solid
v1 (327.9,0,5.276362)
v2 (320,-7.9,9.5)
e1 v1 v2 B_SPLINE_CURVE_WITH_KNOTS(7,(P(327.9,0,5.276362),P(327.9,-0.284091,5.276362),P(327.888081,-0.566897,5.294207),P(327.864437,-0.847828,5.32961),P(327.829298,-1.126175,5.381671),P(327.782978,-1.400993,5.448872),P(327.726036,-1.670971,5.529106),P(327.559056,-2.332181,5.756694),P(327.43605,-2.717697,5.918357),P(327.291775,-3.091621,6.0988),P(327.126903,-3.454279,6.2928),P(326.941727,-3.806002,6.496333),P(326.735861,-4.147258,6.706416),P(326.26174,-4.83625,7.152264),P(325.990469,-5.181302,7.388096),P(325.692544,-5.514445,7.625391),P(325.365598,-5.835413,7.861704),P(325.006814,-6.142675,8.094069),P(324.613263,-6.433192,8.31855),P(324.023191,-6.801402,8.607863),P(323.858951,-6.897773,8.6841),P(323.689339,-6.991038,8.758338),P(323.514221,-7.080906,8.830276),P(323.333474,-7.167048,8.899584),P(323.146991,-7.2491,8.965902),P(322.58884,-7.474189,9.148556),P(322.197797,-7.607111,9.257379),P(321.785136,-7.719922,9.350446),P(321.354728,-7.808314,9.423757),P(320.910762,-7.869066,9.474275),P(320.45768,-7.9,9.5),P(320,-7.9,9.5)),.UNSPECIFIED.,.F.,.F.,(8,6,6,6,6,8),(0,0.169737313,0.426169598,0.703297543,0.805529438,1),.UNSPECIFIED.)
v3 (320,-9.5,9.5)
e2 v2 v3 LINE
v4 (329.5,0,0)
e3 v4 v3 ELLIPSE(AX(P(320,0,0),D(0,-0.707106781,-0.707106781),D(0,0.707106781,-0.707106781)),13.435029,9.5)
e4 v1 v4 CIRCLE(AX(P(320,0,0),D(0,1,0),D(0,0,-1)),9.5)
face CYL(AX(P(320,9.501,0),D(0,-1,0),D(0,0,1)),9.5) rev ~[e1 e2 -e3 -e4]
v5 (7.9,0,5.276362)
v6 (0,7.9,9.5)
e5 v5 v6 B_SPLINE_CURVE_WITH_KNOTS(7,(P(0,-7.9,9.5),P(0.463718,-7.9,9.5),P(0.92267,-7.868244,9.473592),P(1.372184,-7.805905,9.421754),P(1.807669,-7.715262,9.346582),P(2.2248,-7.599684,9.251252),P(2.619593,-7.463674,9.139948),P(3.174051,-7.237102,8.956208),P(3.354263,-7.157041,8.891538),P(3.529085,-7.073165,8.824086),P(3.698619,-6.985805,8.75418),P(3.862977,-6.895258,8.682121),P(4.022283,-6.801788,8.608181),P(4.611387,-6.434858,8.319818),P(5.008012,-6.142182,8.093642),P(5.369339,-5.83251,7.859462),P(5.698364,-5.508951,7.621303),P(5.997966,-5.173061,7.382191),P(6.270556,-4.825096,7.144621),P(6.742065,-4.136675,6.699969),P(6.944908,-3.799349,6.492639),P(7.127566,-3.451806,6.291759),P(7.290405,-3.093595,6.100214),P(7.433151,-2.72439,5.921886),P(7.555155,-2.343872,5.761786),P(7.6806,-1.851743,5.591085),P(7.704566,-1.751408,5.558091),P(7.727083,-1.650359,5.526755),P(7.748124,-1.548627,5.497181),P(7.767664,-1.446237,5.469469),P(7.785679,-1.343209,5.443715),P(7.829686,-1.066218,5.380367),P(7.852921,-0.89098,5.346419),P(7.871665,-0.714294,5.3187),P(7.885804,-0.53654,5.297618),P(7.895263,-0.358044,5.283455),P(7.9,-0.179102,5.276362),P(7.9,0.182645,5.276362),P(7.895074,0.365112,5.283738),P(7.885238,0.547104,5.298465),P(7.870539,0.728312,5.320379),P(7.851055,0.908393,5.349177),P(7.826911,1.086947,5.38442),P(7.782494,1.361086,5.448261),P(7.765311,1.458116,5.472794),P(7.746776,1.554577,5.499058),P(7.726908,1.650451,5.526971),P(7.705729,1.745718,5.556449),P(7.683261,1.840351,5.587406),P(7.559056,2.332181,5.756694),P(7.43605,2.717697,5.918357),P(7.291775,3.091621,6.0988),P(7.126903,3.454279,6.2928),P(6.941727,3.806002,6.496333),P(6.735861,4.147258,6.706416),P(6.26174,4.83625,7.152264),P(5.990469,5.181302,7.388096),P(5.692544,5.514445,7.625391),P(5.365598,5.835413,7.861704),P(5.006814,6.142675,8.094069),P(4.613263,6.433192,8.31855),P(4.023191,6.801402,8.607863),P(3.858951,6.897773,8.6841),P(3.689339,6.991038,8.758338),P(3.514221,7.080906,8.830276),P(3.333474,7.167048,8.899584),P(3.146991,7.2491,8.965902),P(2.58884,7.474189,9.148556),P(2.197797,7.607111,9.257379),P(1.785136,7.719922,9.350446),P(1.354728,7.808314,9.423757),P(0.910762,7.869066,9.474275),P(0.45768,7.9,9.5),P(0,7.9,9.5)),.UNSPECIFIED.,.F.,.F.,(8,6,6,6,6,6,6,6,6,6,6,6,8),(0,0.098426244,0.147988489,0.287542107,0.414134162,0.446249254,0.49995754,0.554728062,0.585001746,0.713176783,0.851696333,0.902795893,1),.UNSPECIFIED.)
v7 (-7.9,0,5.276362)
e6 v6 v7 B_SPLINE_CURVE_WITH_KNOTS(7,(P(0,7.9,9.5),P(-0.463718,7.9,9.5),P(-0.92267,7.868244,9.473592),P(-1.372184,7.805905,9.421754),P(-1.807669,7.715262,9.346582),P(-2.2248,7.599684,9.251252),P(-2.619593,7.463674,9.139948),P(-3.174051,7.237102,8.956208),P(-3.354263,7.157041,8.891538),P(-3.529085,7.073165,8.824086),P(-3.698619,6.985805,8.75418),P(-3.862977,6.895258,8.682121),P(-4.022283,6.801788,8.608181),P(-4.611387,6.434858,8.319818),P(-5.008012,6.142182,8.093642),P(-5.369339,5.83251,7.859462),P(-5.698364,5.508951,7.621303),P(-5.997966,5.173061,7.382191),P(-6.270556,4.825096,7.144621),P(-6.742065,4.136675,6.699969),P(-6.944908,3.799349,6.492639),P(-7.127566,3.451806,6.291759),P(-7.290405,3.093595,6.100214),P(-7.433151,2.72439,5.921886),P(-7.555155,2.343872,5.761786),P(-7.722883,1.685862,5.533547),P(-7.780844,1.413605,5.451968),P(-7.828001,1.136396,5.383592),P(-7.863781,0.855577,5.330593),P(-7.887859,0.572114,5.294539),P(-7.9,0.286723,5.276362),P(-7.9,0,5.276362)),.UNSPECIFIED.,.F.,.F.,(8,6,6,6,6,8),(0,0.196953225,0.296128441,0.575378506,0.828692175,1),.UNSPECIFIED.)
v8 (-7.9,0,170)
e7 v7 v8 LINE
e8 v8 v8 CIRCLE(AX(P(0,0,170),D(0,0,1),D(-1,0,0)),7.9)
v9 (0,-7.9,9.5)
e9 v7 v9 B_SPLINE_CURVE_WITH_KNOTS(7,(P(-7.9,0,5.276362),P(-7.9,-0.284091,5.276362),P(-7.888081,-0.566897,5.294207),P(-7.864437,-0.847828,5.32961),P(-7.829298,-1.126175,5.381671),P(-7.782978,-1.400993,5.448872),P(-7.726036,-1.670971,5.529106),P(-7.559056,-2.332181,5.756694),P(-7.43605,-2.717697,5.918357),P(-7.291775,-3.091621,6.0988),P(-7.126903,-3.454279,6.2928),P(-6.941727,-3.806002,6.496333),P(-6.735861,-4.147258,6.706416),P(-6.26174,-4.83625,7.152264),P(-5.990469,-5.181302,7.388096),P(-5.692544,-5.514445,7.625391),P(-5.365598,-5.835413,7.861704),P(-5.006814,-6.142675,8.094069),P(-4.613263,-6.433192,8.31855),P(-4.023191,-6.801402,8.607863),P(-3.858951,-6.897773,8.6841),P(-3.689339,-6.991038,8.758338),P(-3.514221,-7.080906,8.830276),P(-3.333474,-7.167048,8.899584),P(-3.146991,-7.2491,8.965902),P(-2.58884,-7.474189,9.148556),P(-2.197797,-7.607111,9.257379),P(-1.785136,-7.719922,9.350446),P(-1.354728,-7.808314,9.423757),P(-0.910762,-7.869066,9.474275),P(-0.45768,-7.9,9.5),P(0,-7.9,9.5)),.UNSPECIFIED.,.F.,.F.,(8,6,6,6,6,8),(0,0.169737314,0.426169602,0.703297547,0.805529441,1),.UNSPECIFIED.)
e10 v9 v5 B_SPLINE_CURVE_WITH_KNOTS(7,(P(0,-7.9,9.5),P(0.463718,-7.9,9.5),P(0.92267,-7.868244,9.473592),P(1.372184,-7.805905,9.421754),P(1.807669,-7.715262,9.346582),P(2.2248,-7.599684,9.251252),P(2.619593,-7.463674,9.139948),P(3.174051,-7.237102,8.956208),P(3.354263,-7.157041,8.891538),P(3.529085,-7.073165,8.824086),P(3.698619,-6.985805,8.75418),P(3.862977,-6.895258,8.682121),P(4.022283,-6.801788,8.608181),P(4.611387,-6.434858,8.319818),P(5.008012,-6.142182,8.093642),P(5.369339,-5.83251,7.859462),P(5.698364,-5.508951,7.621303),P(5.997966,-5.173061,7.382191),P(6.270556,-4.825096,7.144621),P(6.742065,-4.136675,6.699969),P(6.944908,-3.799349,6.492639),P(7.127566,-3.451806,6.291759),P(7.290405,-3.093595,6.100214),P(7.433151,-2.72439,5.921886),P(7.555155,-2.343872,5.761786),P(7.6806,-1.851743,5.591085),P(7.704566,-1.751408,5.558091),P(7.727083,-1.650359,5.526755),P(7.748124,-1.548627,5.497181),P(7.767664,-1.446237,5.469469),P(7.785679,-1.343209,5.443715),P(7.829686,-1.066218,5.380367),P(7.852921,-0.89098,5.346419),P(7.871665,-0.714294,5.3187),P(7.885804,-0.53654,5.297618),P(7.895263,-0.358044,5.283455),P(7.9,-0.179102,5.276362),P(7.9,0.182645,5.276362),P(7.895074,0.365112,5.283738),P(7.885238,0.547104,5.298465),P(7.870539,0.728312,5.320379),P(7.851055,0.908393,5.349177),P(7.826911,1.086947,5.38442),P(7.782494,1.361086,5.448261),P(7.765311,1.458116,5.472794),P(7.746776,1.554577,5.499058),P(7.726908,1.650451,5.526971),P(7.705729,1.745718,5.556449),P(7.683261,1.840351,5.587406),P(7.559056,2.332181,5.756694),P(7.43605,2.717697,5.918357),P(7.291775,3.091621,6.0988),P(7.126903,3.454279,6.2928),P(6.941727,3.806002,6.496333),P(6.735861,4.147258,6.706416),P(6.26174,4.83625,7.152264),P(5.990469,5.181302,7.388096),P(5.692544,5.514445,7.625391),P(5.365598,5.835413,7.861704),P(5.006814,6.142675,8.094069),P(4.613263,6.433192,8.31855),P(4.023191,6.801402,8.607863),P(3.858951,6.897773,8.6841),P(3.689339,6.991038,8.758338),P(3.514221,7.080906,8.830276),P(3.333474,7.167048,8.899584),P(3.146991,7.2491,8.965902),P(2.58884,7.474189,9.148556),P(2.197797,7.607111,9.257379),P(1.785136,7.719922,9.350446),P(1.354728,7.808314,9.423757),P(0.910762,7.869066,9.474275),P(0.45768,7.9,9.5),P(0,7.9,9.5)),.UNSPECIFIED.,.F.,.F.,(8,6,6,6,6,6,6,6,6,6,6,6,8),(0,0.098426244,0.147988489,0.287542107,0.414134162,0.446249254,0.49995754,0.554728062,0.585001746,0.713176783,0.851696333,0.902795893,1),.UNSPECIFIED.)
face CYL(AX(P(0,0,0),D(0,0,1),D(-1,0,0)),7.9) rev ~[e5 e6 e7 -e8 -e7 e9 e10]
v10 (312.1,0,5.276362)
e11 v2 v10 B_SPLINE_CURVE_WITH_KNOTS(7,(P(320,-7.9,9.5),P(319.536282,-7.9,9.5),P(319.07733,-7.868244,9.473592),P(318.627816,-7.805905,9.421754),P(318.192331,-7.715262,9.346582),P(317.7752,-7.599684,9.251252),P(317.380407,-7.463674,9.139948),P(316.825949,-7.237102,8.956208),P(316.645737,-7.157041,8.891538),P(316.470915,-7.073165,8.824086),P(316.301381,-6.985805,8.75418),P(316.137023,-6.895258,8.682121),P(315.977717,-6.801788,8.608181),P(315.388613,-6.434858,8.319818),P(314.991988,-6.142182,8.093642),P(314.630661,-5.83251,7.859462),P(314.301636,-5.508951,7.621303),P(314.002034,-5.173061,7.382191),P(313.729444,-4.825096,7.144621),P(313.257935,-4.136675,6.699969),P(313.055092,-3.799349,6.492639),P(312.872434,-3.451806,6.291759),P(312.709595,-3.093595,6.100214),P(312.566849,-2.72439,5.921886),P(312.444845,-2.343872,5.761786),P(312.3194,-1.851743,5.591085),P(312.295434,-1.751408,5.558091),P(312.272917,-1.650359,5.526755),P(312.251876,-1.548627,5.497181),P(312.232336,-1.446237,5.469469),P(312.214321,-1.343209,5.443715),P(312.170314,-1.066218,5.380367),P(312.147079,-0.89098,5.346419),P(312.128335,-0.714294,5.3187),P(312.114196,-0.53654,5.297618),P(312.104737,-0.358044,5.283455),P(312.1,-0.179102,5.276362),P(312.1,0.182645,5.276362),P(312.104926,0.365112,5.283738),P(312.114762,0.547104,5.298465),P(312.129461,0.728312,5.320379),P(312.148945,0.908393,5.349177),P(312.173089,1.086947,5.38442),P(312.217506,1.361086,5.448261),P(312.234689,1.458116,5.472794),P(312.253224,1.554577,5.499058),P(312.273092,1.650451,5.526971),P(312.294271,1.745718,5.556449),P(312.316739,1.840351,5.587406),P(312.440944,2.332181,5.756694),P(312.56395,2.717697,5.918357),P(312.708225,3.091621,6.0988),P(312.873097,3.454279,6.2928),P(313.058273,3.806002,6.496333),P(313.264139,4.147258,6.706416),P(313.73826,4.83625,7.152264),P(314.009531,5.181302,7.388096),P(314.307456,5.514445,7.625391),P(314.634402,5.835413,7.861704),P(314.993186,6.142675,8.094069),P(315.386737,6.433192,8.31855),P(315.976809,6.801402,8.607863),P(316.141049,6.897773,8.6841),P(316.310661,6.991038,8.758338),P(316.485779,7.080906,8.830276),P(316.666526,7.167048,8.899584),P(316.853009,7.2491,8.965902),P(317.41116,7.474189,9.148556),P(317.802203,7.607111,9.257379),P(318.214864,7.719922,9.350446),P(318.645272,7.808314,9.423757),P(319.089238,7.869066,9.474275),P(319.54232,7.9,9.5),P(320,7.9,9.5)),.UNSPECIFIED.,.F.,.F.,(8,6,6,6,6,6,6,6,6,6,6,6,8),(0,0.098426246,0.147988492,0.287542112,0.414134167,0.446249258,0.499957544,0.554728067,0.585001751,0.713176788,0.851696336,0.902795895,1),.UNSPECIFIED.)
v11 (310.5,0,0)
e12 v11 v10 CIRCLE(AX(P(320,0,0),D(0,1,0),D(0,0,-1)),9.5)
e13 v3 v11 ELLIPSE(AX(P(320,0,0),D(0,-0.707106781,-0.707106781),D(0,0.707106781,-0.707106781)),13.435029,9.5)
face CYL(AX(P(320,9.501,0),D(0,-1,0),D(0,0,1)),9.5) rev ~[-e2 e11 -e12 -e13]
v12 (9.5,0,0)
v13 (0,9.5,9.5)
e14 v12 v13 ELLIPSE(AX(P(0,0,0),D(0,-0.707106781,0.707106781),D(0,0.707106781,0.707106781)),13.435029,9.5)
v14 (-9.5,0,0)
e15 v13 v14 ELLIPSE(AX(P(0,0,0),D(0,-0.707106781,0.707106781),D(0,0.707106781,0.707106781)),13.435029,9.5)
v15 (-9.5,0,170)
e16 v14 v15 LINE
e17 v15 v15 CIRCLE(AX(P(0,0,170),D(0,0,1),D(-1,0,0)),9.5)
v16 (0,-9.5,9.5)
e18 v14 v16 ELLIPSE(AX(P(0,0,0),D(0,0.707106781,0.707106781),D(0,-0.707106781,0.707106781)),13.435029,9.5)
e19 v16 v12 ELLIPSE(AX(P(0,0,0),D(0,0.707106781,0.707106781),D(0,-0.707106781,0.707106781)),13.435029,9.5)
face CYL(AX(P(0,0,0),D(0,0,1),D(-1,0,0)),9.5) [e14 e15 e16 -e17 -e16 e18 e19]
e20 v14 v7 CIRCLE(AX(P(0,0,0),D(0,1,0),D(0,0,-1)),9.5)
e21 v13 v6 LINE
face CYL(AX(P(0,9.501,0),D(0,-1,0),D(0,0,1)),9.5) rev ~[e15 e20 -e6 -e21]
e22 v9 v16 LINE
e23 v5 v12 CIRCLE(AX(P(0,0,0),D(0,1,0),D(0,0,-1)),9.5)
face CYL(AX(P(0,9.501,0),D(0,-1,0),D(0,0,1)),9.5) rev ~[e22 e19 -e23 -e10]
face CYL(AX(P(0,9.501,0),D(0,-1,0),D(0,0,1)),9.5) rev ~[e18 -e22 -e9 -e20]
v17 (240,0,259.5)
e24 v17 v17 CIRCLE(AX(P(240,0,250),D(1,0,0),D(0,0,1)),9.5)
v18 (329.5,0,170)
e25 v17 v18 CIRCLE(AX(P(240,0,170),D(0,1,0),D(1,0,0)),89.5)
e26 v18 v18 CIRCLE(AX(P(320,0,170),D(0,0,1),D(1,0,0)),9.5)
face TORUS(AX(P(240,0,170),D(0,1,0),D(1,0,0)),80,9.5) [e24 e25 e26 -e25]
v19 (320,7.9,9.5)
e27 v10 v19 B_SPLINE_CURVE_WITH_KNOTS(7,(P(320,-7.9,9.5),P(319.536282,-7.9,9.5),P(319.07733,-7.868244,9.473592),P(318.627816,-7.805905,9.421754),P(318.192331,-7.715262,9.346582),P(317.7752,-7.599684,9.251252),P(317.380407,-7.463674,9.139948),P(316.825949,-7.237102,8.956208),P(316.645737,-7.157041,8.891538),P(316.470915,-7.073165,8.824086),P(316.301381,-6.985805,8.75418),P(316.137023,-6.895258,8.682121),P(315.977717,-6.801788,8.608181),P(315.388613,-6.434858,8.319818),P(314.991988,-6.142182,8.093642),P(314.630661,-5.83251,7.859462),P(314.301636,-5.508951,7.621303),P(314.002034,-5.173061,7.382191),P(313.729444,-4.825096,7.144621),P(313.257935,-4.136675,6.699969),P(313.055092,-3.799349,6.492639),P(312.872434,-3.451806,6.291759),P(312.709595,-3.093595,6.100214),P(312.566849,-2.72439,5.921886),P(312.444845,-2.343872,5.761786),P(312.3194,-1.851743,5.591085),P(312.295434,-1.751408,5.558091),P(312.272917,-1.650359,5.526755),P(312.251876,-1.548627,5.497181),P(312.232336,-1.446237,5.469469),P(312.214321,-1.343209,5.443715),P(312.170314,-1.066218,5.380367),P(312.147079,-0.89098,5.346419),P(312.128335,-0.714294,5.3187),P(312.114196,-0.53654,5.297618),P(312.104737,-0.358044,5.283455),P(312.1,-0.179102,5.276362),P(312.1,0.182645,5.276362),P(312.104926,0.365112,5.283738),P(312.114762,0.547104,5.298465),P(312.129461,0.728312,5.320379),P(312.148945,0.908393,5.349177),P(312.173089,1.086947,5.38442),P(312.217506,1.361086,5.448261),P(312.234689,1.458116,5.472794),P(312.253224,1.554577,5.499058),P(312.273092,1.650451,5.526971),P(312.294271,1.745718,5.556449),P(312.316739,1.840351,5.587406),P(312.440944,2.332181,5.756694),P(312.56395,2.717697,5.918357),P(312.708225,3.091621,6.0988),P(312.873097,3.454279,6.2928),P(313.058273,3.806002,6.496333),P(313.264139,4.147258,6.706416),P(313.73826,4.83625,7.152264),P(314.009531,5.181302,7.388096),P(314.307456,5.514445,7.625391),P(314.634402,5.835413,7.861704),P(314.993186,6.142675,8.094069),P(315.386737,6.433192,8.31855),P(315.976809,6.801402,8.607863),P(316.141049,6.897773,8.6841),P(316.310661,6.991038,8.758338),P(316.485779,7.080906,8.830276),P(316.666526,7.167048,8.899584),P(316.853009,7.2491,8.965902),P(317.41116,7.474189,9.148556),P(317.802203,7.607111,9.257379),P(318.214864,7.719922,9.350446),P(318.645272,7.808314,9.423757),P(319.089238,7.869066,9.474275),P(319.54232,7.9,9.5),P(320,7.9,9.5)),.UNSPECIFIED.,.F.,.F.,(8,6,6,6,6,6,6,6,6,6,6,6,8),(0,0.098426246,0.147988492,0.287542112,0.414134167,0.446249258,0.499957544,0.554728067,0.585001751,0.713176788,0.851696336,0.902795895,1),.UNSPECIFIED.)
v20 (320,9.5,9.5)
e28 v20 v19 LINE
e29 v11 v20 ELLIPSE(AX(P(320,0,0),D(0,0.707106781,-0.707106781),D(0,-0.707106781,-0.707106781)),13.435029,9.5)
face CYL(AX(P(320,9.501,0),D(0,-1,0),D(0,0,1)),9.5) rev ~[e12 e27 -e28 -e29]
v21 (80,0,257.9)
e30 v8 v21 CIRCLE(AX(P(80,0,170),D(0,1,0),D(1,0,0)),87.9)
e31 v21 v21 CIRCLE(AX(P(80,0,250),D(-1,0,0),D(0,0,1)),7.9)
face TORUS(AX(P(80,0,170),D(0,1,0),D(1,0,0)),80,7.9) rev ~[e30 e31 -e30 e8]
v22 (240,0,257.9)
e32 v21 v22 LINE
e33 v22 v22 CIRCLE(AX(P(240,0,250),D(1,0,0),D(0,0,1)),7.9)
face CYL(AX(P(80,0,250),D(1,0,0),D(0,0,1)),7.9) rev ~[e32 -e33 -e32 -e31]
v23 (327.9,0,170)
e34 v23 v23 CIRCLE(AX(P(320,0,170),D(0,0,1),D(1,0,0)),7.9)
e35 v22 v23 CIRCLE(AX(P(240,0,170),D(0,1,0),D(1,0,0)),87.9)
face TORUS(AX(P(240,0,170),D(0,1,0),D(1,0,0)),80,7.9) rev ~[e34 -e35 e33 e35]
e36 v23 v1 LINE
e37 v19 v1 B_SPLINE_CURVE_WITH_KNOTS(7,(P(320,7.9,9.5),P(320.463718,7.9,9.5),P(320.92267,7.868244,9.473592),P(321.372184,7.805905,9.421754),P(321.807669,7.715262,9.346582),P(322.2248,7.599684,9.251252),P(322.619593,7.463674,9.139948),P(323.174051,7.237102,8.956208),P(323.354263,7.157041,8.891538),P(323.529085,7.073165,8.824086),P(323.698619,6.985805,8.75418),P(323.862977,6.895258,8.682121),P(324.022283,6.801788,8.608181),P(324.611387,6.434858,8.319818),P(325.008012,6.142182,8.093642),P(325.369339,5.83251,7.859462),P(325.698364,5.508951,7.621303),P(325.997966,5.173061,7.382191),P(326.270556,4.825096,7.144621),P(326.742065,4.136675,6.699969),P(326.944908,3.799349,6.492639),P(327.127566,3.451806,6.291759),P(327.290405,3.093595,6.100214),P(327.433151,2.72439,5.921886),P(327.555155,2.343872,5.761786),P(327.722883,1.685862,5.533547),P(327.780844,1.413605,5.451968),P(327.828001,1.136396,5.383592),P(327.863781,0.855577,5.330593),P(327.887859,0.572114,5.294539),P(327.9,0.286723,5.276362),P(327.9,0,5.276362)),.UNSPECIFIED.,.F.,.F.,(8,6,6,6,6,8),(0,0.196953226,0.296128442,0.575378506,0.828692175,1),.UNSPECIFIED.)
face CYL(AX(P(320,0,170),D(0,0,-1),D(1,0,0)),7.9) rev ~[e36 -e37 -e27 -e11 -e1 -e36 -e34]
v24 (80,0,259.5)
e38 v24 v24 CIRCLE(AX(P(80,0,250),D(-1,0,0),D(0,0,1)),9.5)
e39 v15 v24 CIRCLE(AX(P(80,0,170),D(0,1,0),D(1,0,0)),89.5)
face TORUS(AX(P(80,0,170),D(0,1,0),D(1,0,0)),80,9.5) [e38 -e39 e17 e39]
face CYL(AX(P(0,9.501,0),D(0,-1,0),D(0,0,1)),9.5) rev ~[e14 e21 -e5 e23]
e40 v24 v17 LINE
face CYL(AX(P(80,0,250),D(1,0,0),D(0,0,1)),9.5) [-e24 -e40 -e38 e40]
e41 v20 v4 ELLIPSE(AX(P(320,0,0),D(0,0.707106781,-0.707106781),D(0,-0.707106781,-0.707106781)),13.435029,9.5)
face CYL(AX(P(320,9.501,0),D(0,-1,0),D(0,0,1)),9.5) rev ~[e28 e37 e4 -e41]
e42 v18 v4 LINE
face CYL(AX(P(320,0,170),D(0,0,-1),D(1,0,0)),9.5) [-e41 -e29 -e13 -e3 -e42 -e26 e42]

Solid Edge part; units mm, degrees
sketch "Sketch1" plane through (0, 0, 0) normal (0, -1, 0) x (1, 0, 0)
  line L0 (0, 0) -> (0, 170)
  arc A0 (0, 170) -> (80, 250) centre (80, 170) cw
  line L1 (80, 250) -> (240, 250)
  arc A1 (240, 250) -> (320, 170) centre (240, 170) cw
  line L2 (320, 170) -> (320, 0)
  dimension "D1" = 80
  dimension "D2" = 250
  dimension "D3" = 320
sketch "Sketch2" plane through (0, 0, 0) normal (0, 0, -1) x (-1, 0, 0)
  circle A0 centre (0, 0) radius 9.5
  dimension "D1" = 19
sweep "SweptProtrusion_1" add profiles "Sketch2" path "Sketch1"
shell "Thinwall_1" thickness 1.6 removed faces 4 at (6.5233, -6.1433, 0) at (313.4767, -6.1433, 0) at (6.5233, -6.1433, 0) at (313.4767, -6.1433, 0)
hole "Hole_3" at (0, 0, 0) direction (0, -1, 0) diameter 19 end through all both ways yes
hole "Hole1" at (320, 0, 0) direction (0, -1, 0) diameter 19 end through all both ways yes
properties material "Aluminum, 1060"
